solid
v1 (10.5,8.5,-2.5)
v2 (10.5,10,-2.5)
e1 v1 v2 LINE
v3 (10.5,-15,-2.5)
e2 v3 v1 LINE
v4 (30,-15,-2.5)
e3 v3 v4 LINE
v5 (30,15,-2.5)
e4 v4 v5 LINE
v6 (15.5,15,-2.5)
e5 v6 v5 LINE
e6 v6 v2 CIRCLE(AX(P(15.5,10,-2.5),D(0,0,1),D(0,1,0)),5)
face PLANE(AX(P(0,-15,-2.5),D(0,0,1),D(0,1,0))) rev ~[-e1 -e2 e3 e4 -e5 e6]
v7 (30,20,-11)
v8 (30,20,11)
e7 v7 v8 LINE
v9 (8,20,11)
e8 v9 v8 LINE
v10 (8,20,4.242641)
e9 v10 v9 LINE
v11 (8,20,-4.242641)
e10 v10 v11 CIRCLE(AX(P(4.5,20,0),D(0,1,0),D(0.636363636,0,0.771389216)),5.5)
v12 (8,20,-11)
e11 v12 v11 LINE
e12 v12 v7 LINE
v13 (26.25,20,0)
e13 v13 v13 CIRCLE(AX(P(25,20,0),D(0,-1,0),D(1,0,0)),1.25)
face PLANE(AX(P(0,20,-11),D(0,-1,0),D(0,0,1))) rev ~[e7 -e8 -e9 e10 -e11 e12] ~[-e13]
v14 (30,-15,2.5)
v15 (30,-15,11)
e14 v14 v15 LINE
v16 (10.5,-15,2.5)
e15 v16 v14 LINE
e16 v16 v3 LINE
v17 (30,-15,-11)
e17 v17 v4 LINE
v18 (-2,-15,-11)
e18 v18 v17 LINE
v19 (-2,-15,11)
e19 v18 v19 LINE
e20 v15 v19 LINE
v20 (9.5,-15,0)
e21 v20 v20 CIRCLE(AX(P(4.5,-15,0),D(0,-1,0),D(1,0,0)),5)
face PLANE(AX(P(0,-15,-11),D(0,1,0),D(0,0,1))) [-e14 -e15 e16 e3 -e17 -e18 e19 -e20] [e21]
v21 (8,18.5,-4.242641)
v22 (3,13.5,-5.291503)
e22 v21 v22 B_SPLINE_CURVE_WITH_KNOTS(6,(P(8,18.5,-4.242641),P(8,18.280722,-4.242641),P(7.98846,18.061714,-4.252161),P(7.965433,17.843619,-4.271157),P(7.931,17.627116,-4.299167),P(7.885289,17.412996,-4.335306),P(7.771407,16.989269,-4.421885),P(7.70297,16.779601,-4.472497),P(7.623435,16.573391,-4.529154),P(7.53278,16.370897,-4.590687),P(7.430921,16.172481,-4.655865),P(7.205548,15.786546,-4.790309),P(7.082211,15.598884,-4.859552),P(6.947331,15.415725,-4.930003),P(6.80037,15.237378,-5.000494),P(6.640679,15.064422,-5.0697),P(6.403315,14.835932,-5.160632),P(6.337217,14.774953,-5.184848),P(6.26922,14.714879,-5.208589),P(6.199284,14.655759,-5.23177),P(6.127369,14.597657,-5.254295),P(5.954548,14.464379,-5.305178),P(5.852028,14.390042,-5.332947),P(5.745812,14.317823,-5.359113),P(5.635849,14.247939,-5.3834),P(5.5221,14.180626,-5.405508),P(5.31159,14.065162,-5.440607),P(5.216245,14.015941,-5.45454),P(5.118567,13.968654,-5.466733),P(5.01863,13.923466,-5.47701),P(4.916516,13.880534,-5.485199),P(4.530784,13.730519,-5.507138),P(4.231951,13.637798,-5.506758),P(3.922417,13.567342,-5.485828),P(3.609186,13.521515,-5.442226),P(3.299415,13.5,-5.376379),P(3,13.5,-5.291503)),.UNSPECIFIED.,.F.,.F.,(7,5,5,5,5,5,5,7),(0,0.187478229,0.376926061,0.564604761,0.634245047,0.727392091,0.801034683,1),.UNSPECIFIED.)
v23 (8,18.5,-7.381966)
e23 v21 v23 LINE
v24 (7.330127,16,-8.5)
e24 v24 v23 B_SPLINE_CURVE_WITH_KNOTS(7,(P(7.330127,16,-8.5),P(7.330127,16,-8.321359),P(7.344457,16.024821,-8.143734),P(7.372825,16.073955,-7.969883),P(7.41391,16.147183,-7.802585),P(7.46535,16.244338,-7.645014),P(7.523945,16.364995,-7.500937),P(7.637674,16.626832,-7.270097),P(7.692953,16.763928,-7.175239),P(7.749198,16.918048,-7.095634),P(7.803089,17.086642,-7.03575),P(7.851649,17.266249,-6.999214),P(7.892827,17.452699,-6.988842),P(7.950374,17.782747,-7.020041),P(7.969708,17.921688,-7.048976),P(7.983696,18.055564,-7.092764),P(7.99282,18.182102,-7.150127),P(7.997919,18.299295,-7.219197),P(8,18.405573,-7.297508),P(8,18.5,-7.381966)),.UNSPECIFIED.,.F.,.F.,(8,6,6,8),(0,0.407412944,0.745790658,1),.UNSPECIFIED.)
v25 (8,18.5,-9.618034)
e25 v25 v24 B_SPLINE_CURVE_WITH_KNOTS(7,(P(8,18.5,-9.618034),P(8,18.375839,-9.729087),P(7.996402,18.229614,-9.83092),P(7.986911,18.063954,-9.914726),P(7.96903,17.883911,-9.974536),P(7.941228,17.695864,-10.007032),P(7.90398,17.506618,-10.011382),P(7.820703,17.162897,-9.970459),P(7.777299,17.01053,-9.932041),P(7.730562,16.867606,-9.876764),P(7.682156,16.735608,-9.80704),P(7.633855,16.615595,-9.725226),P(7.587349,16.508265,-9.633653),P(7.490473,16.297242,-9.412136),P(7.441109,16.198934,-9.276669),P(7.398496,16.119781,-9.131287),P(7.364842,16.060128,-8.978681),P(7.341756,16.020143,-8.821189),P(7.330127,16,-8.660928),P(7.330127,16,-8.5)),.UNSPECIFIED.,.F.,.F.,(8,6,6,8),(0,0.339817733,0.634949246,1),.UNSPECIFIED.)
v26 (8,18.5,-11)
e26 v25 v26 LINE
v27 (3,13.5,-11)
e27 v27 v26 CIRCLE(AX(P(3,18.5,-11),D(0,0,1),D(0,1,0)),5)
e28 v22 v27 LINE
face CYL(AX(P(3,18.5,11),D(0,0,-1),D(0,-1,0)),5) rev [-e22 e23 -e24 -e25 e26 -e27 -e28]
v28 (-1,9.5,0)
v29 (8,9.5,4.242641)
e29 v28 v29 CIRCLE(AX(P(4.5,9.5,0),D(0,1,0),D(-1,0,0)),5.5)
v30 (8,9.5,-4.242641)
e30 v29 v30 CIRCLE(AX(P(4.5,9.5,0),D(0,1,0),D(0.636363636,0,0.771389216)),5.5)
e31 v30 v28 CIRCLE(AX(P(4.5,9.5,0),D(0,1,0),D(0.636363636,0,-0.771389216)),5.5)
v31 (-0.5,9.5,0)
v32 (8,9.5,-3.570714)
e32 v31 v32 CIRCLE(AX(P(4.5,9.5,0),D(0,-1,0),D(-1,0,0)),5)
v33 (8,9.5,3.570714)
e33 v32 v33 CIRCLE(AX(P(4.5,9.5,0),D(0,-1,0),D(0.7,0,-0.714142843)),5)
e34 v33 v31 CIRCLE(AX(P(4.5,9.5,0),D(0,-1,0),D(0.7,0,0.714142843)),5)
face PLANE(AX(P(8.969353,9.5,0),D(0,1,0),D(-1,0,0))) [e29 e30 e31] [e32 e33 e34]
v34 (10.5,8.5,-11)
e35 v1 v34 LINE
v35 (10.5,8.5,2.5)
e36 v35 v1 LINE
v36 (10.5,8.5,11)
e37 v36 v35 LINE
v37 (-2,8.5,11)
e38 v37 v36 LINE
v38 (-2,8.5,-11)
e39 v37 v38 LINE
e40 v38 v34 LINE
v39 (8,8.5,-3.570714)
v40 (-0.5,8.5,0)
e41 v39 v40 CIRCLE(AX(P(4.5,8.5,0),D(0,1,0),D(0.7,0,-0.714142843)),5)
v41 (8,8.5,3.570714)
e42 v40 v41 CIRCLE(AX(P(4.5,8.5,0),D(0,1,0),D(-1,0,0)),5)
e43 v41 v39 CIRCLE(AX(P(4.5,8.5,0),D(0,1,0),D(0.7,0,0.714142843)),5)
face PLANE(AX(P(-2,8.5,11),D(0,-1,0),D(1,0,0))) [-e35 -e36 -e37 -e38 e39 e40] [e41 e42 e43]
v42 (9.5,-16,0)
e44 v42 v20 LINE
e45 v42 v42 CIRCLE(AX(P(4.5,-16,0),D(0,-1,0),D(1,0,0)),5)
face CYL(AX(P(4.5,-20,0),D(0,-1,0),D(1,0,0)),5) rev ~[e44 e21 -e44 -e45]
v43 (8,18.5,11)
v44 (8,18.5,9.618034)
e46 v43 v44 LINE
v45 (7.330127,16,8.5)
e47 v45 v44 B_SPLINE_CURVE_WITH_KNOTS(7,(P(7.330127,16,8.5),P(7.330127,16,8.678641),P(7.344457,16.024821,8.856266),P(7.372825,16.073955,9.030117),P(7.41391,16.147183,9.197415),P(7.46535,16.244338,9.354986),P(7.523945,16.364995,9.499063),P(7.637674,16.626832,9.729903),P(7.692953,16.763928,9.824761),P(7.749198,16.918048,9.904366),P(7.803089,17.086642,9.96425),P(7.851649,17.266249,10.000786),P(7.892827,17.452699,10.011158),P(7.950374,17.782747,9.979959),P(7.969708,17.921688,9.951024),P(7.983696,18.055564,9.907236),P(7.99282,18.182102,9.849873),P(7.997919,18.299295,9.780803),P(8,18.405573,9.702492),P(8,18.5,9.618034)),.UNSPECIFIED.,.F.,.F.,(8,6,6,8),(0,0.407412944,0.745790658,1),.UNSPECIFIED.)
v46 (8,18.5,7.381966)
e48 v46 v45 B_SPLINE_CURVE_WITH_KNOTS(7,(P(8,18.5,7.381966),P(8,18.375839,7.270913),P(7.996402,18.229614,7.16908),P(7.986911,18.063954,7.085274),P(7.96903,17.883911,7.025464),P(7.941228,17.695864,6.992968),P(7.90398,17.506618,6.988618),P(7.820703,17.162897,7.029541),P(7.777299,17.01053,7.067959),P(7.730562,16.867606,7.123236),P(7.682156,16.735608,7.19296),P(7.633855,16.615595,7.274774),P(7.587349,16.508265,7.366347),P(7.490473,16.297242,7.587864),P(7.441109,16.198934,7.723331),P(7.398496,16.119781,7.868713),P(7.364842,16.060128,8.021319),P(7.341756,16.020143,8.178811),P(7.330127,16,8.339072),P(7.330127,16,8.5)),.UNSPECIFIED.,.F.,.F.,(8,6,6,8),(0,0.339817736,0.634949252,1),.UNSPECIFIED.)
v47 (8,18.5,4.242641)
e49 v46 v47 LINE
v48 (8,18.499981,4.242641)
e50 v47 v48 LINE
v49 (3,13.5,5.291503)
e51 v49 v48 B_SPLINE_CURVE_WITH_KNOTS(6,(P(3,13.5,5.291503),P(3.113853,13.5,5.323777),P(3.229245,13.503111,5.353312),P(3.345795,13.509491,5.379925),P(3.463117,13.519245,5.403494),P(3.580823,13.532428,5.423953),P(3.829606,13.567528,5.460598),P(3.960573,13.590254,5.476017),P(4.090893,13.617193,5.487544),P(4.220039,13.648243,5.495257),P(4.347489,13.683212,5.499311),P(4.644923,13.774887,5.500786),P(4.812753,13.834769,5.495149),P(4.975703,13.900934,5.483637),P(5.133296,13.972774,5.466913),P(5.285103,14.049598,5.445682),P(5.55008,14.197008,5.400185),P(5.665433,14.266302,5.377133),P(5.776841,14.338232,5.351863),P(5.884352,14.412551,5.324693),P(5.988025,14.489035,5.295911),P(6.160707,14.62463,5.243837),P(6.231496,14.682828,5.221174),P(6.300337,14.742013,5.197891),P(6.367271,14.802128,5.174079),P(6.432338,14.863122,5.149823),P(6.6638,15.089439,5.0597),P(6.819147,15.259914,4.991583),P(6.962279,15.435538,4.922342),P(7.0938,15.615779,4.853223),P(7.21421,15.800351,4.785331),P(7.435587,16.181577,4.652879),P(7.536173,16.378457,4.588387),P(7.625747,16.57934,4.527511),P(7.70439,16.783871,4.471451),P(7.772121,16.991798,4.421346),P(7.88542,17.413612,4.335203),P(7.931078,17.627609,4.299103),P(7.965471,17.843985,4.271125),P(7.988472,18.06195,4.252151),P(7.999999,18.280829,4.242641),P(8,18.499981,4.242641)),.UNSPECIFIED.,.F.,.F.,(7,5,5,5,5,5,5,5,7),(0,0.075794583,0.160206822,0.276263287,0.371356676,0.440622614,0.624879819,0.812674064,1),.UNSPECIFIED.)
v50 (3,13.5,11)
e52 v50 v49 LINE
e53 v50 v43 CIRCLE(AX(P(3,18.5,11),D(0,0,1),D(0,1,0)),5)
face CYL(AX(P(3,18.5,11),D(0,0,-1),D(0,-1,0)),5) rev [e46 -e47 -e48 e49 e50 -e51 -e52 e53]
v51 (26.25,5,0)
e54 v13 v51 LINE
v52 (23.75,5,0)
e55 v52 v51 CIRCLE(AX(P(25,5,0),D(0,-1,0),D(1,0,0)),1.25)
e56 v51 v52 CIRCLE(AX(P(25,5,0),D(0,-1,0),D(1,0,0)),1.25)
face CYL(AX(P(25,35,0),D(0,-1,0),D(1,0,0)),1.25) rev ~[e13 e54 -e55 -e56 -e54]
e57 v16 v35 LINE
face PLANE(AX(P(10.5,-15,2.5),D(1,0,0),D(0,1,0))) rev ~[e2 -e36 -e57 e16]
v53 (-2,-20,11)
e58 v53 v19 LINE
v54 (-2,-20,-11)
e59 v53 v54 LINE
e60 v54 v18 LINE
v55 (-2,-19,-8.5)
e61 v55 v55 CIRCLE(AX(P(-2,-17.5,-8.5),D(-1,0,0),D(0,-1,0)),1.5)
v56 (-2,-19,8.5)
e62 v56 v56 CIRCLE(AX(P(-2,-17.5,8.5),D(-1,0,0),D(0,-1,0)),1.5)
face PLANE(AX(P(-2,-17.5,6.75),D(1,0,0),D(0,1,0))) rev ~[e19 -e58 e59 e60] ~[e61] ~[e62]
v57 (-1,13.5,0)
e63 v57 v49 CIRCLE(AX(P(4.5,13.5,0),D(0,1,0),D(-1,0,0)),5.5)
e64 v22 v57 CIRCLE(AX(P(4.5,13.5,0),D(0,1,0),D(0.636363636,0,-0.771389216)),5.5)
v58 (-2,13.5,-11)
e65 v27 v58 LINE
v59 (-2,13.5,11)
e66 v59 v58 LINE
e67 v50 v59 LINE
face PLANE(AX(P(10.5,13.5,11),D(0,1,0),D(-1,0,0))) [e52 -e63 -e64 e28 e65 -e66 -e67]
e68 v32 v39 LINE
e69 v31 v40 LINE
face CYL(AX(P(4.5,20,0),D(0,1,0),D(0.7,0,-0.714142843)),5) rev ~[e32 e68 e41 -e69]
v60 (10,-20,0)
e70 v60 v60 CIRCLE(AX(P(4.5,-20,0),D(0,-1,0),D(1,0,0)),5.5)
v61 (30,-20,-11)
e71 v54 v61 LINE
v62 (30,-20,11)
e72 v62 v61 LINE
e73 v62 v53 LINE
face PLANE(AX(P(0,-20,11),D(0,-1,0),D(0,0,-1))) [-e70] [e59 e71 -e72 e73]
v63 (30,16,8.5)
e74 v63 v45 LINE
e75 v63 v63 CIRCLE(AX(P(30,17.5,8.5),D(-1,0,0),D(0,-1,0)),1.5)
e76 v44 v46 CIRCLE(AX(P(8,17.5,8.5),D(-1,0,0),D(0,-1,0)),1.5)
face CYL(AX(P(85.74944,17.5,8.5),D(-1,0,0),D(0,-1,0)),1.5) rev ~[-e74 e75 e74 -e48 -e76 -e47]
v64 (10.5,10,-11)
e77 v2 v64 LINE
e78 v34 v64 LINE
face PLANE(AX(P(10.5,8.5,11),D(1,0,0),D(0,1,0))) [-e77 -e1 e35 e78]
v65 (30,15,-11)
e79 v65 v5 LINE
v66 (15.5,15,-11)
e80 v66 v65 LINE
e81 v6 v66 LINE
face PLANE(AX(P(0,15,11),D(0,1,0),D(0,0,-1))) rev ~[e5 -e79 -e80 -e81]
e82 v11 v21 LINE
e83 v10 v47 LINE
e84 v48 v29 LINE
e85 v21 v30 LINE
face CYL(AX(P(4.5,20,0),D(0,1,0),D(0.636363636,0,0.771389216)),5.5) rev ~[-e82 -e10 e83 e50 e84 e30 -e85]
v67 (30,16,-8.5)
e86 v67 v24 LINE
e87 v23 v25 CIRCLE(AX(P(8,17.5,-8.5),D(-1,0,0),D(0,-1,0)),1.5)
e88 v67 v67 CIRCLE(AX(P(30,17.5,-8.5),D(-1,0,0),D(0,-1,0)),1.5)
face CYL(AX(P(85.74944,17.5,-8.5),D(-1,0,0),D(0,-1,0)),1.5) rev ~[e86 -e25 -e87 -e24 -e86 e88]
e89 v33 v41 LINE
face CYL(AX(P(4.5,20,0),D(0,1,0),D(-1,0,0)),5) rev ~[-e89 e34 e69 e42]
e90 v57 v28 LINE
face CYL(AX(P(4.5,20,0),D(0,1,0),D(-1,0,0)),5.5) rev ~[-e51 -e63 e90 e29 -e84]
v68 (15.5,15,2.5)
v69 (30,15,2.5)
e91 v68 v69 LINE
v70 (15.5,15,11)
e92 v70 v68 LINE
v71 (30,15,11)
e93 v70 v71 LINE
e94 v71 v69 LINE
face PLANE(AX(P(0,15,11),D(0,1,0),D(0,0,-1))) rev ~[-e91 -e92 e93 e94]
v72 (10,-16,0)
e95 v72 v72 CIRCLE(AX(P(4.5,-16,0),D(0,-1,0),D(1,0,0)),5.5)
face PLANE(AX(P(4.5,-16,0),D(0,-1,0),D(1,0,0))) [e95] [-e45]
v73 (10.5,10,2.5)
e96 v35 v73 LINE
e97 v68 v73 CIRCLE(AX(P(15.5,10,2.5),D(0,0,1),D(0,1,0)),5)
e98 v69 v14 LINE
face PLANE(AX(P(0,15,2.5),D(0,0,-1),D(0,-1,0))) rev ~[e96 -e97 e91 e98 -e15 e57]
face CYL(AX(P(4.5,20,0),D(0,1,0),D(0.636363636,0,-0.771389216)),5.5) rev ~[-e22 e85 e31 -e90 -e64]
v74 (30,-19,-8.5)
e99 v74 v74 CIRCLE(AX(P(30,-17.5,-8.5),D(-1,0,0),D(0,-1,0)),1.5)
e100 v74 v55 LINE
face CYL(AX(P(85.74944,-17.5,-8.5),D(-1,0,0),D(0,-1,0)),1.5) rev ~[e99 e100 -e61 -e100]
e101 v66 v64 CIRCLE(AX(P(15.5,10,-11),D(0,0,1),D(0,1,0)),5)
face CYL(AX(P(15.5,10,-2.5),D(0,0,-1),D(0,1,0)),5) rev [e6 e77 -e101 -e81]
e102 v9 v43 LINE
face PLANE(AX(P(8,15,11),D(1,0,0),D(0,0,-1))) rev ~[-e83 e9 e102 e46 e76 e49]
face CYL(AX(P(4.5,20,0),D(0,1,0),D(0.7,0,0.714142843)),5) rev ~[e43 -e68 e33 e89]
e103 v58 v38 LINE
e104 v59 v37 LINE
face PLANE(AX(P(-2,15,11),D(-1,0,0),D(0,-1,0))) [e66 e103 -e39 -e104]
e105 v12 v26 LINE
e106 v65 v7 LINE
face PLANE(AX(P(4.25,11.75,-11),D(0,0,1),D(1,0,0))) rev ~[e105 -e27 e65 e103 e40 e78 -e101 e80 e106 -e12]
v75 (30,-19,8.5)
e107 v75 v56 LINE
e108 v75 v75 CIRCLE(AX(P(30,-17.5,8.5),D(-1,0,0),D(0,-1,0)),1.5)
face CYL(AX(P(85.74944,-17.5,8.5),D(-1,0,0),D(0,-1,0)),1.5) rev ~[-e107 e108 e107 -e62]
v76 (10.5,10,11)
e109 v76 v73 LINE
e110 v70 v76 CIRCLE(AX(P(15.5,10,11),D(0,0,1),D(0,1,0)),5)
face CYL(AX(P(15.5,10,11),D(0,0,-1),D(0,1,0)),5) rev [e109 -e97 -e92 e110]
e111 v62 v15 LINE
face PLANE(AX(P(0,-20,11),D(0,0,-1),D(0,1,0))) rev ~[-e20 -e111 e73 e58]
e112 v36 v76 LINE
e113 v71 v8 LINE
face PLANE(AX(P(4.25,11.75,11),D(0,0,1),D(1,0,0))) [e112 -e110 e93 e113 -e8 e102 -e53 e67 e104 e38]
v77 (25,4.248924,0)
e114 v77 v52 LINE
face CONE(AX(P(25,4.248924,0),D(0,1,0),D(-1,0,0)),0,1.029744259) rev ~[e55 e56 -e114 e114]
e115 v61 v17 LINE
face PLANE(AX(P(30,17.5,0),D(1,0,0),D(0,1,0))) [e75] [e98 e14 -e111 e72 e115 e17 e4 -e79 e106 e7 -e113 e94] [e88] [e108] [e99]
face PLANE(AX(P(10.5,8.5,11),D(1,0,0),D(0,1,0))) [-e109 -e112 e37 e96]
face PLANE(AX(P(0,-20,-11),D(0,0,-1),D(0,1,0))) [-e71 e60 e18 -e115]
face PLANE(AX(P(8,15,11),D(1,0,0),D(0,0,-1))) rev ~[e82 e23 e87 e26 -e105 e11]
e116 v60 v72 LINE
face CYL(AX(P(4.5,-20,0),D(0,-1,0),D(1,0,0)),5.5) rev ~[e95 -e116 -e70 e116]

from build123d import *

# Parameters (mm, degrees)
F0_W      = 5
F0_H      = 5
F0_H_2    = 8.5
F0_W_2    = 30
F1_DEPTH  = 30
F2_DEPTH  = 2
F4_W      = 10.5
F4_H      = 30
F5_DEPTH  = 13.501
F3_R      = 5.5
F3_R_2    = 5
F3_R_3    = 2.5
F6_DEPTH  = 4
F7_DEPTH  = 5
F9_DEPTH  = 22
F10_DEPTH = 8
F11_DEPTH = 1.5
F12_R     = 5
F13_R     = 5
F15_DEPTH = 10.5
F14_R     = 2.5
F16_DEPTH = 11.5
F18_D     = 3
F20_D     = 2.5
F20_DEPTH = 15
F20_TIP   = 0.7510757738


# Not quite as in the source:
# - a feature names something its author has since deleted; it is built from what else it names


with BuildPart() as f1:
    # F0 (on Right) → F1 (new body)
    with BuildSketch(Plane.YZ):
        with Locations((17.5, 0)):
            Rectangle(F0_W, F0_H)
        with Locations((17.5, 6.75)):
            Rectangle(F0_W, F0_H_2)
        Rectangle(F0_W_2, F0_H)
        with Locations((17.5, -6.75)):
            Rectangle(F0_W, F0_H_2)
        with Locations((-17.5, 0)):
            Rectangle(F0_W, F0_H)
        with Locations((-17.5, 6.75)):
            Rectangle(F0_W, F0_H_2)
        with Locations((-17.5, -6.75)):
            Rectangle(F0_W, F0_H_2)
    extrude(amount=F1_DEPTH)

    # F0 (on Right) → F2 (join)
    with BuildSketch(Plane.YZ):
        with Locations((-17.5, 6.75)):
            Rectangle(F0_W, F0_H_2)
        with Locations((-17.5, 0)):
            Rectangle(F0_W, F0_H)
        with Locations((-17.5, -6.75)):
            Rectangle(F0_W, F0_H_2)
    extrude(amount=-F2_DEPTH)

    # F4 (on face) → F5 (cut, through all)
    with BuildSketch(Plane.XY.offset(2.5)):
        with Locations((5.25, 0)):
            Rectangle(F4_W, F4_H)
    extrude(amount=-F5_DEPTH, mode=Mode.SUBTRACT)

    # F3 (on face) → F6 (cut)
    with BuildSketch(Plane.XZ.offset(20)):
        with Locations((4.5, 0)):
            Circle(F3_R)
        with Locations((4.5, 0)):
            Circle(F3_R_2, mode=Mode.SUBTRACT)
        with Locations((4.5, 0)):
            Circle(F3_R_2)
        with Locations((4.5, 0)):
            Circle(F3_R_3, mode=Mode.SUBTRACT)
        with Locations((4.5, 0)):
            Circle(F3_R_3)
    extrude(amount=-F6_DEPTH, mode=Mode.SUBTRACT)

    # F3 (on face) → F7 (cut, through all)
    with BuildSketch(Plane.XZ.offset(20)):
        with Locations((4.5, 0)):
            Circle(F3_R_2)
        with Locations((4.5, 0)):
            Circle(F3_R_3, mode=Mode.SUBTRACT)
        with Locations((4.5, 0)):
            Circle(F3_R_3)
    extrude(amount=-F7_DEPTH, mode=Mode.SUBTRACT)

    # F8 (on face) → F9 (join, through all)
    with BuildSketch(Plane.XY.offset(11)):
        Polygon((10.5, 8.5), (10.5, 15), (0, 15), (-2, 15), (-2, 8.5), align=None)
    extrude(amount=-F9_DEPTH)

    # F10 (cut): a face of the model
    f10_faces = [f1.faces().sort_by_distance(p)[0] for p in [
        (0, 17.5, 0),
    ]]
    extrude(f10_faces, amount=-F10_DEPTH, mode=Mode.SUBTRACT)

    # F11 (cut): a face of the model
    f11_faces = [f1.faces().sort_by_distance(p)[0] for p in [
        (3, 15, 0),
    ]]
    extrude(f11_faces, amount=-F11_DEPTH, mode=Mode.SUBTRACT)

    # F12
    f12_edges = [f1.edges().sort_by_distance(p)[0] for p in [
        (8, 13.5, 0),
    ]]
    fillet(f12_edges, radius=F12_R)

    # F13
    f13_edges = [f1.edges().sort_by_distance(p)[0] for p in [
        (10.5, 15, 6.75),
        (10.5, 15, -6.75),
    ]]
    fillet(f13_edges, radius=F13_R)

    # F14 (on face) → F15 (cut)
    with BuildSketch(Plane(origin=(0, 20, 0), x_dir=(-1, 0, 0), z_dir=(0, 1, 0))):
        with BuildLine():
            Line((-8, 3.5707142143), (-8, 4.2426406871))
            ThreePointArc((-8, 4.2426406871), (-10, 0), (-8, -4.2426406871))
            Line((-8, -4.2426406871), (-8, -3.5707142143))
            ThreePointArc((-8, -3.5707142143), (-9.5, 0), (-8, 3.5707142143))
        make_face()
        with BuildLine():
            ThreePointArc((-8, -4.2426406871), (-2.1547921201, -4.9749371855), (1, 0))
            ThreePointArc((1, 0), (-2.1547921201, 4.9749371855), (-8, 4.2426406871))
            Line((-8, 4.2426406871), (-8, 3.5707142143))
            ThreePointArc((-8, 3.5707142143), (-2.5635083269, 4.6097722286), (0.5, 0))
            ThreePointArc((0.5, 0), (-2.5635083269, -4.6097722286), (-8, -3.5707142143))
            Line((-8, -3.5707142143), (-8, -4.2426406871))
        make_face()
    extrude(amount=-F15_DEPTH, mode=Mode.SUBTRACT)

    # F14 (on face) → F16 (cut, through all)
    with BuildSketch(Plane(origin=(0, 20, 0), x_dir=(-1, 0, 0), z_dir=(0, 1, 0))):
        with BuildLine():
            ThreePointArc((0.5, 0), (-2.5635083269, 4.6097722286), (-8, 3.5707142143))
            Line((-8, 3.5707142143), (-8, -3.5707142143))
            ThreePointArc((-8, -3.5707142143), (-2.5635083269, -4.6097722286), (0.5, 0))
        make_face()
        with Locations((-4.5, 0)):
            Circle(F14_R, mode=Mode.SUBTRACT)
        with Locations((-4.5, 0)):
            Circle(F14_R)
        with BuildLine():
            Line((-8, -3.5707142143), (-8, 3.5707142143))
            ThreePointArc((-8, 3.5707142143), (-9.5, 0), (-8, -3.5707142143))
        make_face()
    extrude(amount=-F16_DEPTH, mode=Mode.SUBTRACT)

    # F18 (through all)
    with Locations(Plane.YZ.offset(30)):
        with Locations((-17.5, 8.5), (-17.5, -8.5), (17.5, 8.5), (17.5, -8.5)):
            Hole(F18_D / 2)

    # F20
    with Locations(Plane(origin=(0, 20, 0), x_dir=(-1, 0, 0), z_dir=(0, 1, 0))):
        with Locations((-25, 0)):
            Hole(F20_D / 2, depth=F20_DEPTH)
            with Locations((0, 0, -(F20_DEPTH + F20_TIP / 2))):  # 118° drill point
                Cone(0, F20_D / 2, F20_TIP, mode=Mode.SUBTRACT)


solid = f1.part
